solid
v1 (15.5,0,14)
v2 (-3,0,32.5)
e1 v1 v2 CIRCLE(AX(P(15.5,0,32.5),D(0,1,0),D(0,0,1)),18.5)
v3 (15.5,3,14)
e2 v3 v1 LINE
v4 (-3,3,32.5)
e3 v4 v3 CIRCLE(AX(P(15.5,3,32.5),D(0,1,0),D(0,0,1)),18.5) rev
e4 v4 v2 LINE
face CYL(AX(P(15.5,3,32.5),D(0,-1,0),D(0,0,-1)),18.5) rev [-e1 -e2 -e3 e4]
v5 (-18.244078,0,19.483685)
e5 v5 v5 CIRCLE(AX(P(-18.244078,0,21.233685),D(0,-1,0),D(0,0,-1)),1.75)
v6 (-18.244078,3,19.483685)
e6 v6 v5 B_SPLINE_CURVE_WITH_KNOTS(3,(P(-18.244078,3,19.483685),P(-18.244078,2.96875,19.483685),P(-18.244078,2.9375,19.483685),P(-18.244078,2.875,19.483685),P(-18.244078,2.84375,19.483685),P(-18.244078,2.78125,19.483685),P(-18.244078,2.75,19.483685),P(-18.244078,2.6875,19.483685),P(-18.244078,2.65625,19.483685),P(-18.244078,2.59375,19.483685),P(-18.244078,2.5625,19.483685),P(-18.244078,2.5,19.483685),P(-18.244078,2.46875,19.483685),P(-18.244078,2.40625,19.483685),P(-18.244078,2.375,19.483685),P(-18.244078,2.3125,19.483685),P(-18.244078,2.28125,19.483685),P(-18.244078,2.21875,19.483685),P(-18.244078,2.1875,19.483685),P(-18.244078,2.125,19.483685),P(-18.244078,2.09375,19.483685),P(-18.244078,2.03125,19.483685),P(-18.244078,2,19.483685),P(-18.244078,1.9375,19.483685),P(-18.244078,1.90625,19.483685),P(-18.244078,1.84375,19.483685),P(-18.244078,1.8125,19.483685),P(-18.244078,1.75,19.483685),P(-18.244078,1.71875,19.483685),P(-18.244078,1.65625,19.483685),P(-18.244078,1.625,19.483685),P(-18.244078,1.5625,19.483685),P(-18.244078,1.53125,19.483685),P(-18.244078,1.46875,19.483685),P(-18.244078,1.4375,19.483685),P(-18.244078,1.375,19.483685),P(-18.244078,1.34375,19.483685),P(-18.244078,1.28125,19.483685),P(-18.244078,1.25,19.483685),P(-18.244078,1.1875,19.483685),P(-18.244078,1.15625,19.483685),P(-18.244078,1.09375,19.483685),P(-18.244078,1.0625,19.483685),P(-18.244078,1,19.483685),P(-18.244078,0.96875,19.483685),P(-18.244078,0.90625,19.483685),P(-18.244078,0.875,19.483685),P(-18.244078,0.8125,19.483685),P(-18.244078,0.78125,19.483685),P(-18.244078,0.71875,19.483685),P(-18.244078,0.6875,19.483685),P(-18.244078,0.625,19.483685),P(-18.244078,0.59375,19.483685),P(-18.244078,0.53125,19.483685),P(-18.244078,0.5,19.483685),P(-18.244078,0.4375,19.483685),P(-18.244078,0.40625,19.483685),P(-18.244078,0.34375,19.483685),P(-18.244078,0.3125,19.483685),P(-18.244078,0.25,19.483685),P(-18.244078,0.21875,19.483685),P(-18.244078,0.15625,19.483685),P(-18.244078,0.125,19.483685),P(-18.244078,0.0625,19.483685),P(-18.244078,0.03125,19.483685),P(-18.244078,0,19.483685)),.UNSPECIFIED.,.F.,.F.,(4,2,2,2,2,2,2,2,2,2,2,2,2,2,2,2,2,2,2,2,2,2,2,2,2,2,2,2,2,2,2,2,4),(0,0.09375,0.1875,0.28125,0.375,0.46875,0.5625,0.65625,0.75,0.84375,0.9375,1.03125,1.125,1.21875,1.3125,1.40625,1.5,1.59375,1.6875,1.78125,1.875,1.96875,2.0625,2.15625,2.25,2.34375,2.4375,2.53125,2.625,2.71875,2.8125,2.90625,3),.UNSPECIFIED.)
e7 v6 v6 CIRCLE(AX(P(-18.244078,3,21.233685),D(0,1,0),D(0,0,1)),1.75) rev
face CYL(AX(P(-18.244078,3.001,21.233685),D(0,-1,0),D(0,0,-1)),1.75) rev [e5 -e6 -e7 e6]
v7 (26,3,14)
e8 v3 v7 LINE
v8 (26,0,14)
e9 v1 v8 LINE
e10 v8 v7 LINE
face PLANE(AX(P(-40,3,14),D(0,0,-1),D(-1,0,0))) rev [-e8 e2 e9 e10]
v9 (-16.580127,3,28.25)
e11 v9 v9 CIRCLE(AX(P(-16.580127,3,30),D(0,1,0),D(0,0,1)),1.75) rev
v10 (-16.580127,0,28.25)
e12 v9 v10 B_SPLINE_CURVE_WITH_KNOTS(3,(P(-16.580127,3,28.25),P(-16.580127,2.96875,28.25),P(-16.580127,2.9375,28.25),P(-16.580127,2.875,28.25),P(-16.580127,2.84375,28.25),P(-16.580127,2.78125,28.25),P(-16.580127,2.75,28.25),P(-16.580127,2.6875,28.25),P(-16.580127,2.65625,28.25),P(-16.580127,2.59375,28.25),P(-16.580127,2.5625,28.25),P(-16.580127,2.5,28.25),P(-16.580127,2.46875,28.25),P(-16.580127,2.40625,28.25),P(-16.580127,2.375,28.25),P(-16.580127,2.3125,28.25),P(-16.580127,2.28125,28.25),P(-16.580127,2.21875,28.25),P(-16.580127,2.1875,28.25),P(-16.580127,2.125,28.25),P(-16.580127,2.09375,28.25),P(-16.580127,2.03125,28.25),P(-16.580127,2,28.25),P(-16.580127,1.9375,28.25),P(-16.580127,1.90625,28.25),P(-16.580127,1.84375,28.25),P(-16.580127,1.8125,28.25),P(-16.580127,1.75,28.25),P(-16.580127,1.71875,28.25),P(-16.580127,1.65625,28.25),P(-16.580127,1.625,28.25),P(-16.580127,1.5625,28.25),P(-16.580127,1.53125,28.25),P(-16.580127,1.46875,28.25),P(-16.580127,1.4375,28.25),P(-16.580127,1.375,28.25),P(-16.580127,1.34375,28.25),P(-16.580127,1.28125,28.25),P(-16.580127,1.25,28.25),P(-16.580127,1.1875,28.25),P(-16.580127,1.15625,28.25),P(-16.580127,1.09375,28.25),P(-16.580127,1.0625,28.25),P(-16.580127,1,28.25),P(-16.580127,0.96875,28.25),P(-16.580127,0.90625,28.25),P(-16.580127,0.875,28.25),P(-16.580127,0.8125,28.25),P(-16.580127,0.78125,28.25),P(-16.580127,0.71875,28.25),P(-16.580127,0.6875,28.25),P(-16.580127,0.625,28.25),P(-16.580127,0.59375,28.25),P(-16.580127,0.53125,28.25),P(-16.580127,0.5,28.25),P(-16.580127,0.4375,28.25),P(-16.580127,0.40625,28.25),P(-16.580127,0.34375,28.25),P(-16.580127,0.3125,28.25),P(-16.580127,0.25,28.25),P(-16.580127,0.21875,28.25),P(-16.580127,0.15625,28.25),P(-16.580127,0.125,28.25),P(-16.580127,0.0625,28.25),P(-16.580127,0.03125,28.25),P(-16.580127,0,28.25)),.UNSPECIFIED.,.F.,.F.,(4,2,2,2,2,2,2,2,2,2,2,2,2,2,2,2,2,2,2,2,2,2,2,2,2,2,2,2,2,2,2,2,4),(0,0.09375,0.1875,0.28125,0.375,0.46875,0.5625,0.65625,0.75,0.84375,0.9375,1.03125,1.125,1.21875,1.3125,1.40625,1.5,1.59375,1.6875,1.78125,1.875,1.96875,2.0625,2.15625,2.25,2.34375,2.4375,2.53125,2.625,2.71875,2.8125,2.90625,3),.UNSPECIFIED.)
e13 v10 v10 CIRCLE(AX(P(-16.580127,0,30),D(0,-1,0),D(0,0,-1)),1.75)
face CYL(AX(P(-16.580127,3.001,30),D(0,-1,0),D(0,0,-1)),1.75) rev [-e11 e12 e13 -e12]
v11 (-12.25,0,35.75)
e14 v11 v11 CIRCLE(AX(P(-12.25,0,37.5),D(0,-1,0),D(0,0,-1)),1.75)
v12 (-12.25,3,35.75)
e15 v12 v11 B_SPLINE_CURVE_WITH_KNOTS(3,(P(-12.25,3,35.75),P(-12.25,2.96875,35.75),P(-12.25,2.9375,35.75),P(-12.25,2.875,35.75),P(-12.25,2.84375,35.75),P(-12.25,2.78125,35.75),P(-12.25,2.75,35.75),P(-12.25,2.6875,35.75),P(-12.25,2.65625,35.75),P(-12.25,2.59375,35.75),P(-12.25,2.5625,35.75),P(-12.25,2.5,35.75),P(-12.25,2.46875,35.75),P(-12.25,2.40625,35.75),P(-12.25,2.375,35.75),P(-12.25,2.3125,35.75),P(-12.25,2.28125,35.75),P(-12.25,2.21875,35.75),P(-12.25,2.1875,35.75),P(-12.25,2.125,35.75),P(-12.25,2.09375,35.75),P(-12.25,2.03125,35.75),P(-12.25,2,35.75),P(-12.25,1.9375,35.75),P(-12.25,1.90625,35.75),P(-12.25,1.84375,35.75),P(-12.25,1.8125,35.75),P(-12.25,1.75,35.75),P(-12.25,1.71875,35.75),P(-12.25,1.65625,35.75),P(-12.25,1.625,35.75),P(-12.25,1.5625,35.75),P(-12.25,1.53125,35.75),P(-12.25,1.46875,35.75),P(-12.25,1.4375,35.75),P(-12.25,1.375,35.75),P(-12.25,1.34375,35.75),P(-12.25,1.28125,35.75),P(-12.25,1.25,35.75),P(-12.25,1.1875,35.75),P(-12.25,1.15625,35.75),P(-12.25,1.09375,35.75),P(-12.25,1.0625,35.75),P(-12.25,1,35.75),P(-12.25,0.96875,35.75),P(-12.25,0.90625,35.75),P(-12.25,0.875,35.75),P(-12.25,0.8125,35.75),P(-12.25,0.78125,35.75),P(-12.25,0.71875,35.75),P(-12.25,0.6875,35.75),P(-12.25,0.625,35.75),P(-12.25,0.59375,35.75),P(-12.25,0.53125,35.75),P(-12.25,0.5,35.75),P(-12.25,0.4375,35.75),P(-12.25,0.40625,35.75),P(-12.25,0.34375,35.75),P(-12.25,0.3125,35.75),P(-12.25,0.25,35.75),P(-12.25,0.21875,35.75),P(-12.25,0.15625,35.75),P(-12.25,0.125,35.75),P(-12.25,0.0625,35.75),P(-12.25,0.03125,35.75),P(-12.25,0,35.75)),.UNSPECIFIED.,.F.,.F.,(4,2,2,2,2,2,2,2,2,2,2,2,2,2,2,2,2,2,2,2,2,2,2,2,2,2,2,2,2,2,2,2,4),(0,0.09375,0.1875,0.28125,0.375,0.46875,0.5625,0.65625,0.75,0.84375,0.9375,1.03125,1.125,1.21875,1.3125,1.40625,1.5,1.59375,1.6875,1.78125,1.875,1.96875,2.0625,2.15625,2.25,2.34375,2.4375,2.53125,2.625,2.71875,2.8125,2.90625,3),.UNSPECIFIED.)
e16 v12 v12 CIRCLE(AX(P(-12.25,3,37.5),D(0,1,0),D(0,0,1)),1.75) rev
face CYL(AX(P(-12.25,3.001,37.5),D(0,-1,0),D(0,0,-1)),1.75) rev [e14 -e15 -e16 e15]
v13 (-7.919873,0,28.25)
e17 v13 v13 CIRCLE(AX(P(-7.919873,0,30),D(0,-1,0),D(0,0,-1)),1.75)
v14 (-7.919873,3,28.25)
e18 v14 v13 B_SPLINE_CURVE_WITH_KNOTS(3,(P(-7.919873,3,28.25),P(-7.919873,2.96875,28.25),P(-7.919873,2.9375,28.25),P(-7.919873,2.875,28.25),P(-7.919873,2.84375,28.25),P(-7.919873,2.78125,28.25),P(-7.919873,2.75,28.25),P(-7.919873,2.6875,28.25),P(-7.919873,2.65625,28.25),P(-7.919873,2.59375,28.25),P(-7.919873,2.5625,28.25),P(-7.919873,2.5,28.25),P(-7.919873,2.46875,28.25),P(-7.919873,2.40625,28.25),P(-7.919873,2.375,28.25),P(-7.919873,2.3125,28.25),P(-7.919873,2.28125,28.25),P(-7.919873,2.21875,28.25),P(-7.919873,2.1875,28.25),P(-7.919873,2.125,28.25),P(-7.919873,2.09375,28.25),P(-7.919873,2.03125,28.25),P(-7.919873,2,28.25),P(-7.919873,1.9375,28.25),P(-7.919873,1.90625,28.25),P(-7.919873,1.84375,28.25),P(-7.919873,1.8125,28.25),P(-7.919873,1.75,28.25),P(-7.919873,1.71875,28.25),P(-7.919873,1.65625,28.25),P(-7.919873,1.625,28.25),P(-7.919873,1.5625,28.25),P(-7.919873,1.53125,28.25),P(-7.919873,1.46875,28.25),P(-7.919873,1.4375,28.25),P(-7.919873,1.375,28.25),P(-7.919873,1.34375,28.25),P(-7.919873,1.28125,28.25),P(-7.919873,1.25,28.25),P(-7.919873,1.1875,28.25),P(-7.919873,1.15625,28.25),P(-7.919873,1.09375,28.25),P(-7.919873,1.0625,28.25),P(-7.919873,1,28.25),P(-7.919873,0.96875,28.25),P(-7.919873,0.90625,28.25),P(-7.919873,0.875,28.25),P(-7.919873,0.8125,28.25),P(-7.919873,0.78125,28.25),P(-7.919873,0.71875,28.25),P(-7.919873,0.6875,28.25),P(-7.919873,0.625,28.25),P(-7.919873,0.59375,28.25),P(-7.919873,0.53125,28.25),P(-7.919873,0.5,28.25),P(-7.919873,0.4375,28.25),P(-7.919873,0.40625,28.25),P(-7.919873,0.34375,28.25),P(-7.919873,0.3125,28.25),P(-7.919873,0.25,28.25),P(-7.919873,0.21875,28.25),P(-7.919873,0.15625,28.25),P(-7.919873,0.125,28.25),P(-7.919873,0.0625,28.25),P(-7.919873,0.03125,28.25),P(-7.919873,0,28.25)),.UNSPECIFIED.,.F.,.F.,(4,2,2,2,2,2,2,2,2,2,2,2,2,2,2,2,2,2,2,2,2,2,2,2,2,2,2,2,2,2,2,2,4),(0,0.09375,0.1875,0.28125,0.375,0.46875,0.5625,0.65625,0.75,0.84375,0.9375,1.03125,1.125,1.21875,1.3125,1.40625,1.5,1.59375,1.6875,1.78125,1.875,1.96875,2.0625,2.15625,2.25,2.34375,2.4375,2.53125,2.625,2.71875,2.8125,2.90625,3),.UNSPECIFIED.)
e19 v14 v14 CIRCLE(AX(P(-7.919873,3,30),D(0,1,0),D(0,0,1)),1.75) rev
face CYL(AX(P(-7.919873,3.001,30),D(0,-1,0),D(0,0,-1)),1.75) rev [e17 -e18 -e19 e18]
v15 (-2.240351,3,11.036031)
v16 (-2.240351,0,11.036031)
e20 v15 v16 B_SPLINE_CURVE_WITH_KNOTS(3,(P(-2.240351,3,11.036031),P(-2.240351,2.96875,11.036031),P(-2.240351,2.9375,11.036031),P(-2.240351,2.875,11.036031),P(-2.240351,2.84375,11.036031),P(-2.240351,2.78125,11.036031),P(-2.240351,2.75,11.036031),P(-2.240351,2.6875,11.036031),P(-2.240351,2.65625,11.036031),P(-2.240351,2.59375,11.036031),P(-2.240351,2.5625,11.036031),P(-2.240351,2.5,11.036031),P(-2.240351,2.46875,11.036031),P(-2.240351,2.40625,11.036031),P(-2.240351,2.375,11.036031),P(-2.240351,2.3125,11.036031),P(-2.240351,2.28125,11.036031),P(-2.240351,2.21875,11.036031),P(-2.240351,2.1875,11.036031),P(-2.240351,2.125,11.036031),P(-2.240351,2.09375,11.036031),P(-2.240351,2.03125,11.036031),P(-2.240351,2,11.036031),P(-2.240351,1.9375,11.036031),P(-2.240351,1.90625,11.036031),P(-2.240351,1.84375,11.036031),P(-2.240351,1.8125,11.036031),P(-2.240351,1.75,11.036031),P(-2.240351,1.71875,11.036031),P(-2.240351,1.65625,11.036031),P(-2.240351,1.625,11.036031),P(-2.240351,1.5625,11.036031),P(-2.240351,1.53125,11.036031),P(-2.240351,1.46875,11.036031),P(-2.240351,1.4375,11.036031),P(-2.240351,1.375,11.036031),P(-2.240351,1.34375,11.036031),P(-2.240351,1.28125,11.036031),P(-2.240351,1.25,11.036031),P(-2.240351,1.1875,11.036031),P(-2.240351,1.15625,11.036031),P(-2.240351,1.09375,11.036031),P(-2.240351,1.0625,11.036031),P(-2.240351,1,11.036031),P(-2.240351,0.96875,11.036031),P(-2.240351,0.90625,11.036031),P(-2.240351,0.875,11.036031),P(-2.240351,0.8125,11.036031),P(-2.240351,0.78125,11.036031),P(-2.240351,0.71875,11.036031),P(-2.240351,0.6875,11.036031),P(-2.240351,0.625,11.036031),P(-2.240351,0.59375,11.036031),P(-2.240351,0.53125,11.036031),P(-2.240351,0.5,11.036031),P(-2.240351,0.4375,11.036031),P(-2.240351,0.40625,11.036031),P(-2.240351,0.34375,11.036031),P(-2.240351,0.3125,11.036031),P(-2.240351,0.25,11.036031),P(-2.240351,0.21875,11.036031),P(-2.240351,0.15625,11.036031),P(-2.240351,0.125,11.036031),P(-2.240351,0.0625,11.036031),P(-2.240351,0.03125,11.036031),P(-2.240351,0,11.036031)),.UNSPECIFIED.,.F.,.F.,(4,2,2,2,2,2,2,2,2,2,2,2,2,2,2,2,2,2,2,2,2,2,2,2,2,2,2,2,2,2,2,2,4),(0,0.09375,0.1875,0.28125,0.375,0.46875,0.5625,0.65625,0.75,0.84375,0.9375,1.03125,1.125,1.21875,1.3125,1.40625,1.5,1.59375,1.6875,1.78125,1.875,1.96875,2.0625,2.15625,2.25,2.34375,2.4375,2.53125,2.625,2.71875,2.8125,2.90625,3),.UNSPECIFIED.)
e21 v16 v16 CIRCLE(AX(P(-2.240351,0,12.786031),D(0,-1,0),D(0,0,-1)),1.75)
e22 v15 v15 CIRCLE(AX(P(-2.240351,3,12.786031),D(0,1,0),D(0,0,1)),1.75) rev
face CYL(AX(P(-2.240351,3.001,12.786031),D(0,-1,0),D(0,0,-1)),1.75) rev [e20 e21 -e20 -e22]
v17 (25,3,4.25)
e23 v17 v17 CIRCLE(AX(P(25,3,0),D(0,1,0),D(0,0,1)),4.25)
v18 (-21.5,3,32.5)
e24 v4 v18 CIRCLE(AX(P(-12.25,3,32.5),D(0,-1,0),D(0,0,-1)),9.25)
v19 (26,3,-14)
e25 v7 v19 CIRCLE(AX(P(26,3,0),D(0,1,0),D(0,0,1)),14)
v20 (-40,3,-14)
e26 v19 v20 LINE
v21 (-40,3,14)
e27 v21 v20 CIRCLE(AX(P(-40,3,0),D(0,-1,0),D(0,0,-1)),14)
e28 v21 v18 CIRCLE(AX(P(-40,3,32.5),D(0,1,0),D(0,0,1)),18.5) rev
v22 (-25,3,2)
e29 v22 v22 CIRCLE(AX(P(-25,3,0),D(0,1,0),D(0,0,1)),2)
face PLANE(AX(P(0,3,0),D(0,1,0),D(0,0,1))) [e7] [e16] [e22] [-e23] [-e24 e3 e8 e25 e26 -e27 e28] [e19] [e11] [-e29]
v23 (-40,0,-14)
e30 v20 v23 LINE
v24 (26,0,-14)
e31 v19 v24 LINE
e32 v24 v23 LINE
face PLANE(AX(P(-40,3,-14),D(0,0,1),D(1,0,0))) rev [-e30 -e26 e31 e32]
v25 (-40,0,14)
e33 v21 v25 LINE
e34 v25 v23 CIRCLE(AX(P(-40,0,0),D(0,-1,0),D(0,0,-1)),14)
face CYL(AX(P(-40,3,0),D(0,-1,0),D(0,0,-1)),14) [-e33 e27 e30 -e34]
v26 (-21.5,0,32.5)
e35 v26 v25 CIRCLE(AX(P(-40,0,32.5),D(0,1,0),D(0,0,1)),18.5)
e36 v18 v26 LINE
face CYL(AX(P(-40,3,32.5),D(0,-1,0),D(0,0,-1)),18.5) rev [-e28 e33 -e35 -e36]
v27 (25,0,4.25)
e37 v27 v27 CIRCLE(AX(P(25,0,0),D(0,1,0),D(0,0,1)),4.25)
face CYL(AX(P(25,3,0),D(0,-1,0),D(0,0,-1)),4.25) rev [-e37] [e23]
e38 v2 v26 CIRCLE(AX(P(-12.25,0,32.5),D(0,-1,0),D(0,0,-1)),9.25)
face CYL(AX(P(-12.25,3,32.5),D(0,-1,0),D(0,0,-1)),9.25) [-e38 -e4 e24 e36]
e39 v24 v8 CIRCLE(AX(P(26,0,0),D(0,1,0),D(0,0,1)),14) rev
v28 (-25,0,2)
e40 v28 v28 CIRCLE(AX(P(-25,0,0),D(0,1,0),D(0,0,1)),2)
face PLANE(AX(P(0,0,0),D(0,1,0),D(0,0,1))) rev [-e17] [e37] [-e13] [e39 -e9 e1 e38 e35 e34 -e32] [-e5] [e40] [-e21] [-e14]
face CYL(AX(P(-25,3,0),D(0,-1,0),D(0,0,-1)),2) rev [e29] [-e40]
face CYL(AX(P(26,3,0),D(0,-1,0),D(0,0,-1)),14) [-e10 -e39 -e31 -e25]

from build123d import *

# Parameters (mm, degrees)
SKETCH_1_W          = 80
SKETCH_1_H          = 28
SKETCH_1_R          = 4.25
SKETCH_1_R_2        = 2
EXTRUDE_1_DEPTH     = 3
FILLET_2_RADIUS     = 14
FILLET_2_LENGTH     = 3
EXTRUDE_3_DEPTH     = 3
SKETCH_5_W          = 18.5
SKETCH_5_H          = 18.5
EXTRUDE_4_DEPTH     = 3
FILLET_3_R          = 18.5
EXTRUDE_5_DEPTH     = 3
CUT_EXTRUDE_1_REACH = 70.323
SKETCH_10_R         = 1.75


with BuildPart() as part:
    # 草图1 → 凸台-拉伸1 (new body)
    with BuildSketch(Plane(origin=(0, 0, 0), x_dir=(1, 0, 0), z_dir=(0, 1, 0))):
        Rectangle(SKETCH_1_W, SKETCH_1_H)
        with Locations(Location((25, 0, 0), (0, 0, 270))):
            Circle(SKETCH_1_R, mode=Mode.SUBTRACT)
        with Locations(Location((-25, 0, 0), (0, 0, 270))):
            Circle(SKETCH_1_R_2, mode=Mode.SUBTRACT)
    extrude(amount=EXTRUDE_1_DEPTH)

    # 圆角2: full round fillet: the end face becomes a half cylinder, R = half its width
    fillet_2_face = Plane((40, 1.5, 0), x_dir=(0, -1, 0), z_dir=(1, 0, 0))  # on the end face: x along it, z out of the body
    fillet_2_slab = fillet_2_face.offset(-FILLET_2_RADIUS / 2) * Box(FILLET_2_LENGTH, 2 * FILLET_2_RADIUS, FILLET_2_RADIUS, mode=Mode.PRIVATE)  # the body's end, R deep
    fillet_2_round = Plane((26, 1.5, 0), x_dir=(1, 0, 0), z_dir=(0, -1, 0)) * Cylinder(FILLET_2_RADIUS, FILLET_2_LENGTH, mode=Mode.PRIVATE)  # its axis R under the face
    add(fillet_2_slab - fillet_2_round, mode=Mode.SUBTRACT)

    # 草图4 → 凸台-拉伸3 (add)
    with BuildSketch(Plane.XZ):
        with BuildLine():
            Line((-40, 14), (-40, -14))
            ThreePointArc((-40, -14), (-54, 0), (-40, 14))
        make_face()
    extrude(amount=-EXTRUDE_3_DEPTH)

    # 草图5 → 凸台-拉伸4 (add)
    with BuildSketch(Plane(origin=(0, 0, 0), x_dir=(-1, 0, 0), z_dir=(0, -1, 0))):
        with Locations((12.25, -23.25)):
            Rectangle(SKETCH_5_W, SKETCH_5_H)
    extrude(amount=-EXTRUDE_4_DEPTH)

    # 圆角3
    fillet_3_edges = [part.edges().sort_by_distance(p)[0] for p in [
        (-21.5, 1.5, 14),
        (-3, 1.5, 14),
    ]]
    fillet(fillet_3_edges, radius=FILLET_3_R - 0.0001)  # a hair under: the kernel refuses the full size

    # 草图6 → 凸台-拉伸5 (add)
    with BuildSketch(Plane.XZ):
        with BuildLine():
            Line((-21.5, 32.5), (-3, 32.5))
            ThreePointArc((-3, 32.5), (-12.25, 41.75), (-21.5, 32.5))
        make_face()
    extrude(amount=-EXTRUDE_5_DEPTH)

    # 草图10 → 切除-拉伸1 (cut, up to next)
    with BuildSketch(Plane.XZ, mode=Mode.PRIVATE) as cut_extrude_1_sk1:
        with Locations(Location((-12.25, 37.5, 0), (0, 0, 270))):
            Circle(SKETCH_10_R)
    cut_extrude_1_tool1 = extrude(cut_extrude_1_sk1.sketch, amount=-CUT_EXTRUDE_1_REACH, mode=Mode.PRIVATE) & part.part
    # 草图10 → 切除-拉伸1 (cut, up to next)
    with BuildSketch(Plane.XZ, mode=Mode.PRIVATE) as cut_extrude_1_sk2:
        with Locations(Location((-7.919872981, 30, 0), (0, 0, 270))):
            Circle(SKETCH_10_R)
    cut_extrude_1_tool2 = extrude(cut_extrude_1_sk2.sketch, amount=-CUT_EXTRUDE_1_REACH, mode=Mode.PRIVATE) & part.part
    # 草图10 → 切除-拉伸1 (cut, up to next)
    with BuildSketch(Plane.XZ, mode=Mode.PRIVATE) as cut_extrude_1_sk3:
        with Locations(Location((-16.580127019, 30, 0), (0, 0, 270))):
            Circle(SKETCH_10_R)
    cut_extrude_1_tool3 = extrude(cut_extrude_1_sk3.sketch, amount=-CUT_EXTRUDE_1_REACH, mode=Mode.PRIVATE) & part.part
    # 草图10 → 切除-拉伸1 (cut, up to next)
    with BuildSketch(Plane.XZ, mode=Mode.PRIVATE) as cut_extrude_1_sk4:
        with Locations(Location((-18.244078093, 21.233684631, 0), (0, 0, 270))):
            Circle(SKETCH_10_R)
    cut_extrude_1_tool4 = extrude(cut_extrude_1_sk4.sketch, amount=-CUT_EXTRUDE_1_REACH, mode=Mode.PRIVATE) & part.part
    # 草图10 → 切除-拉伸1 (cut, up to next)
    with BuildSketch(Plane.XZ, mode=Mode.PRIVATE) as cut_extrude_1_sk5:
        with Locations(Location((-2.240350538, 12.7860315, 0), (0, 0, 270))):
            Circle(SKETCH_10_R)
    cut_extrude_1_tool5 = extrude(cut_extrude_1_sk5.sketch, amount=-CUT_EXTRUDE_1_REACH, mode=Mode.PRIVATE) & part.part
    add(cut_extrude_1_tool1.solids().sort_by_distance((-12.25, 0, 37.5))[0], mode=Mode.SUBTRACT)
    add(cut_extrude_1_tool2.solids().sort_by_distance((-7.919873, 0, 30))[0], mode=Mode.SUBTRACT)
    add(cut_extrude_1_tool3.solids().sort_by_distance((-16.580127, 0, 30))[0], mode=Mode.SUBTRACT)
    add(cut_extrude_1_tool4.solids().sort_by_distance((-18.244078, 0, 21.233685))[0], mode=Mode.SUBTRACT)
    add(cut_extrude_1_tool5.solids().sort_by_distance((-2.240351, 0, 12.786031))[0], mode=Mode.SUBTRACT)


solid = part.part
